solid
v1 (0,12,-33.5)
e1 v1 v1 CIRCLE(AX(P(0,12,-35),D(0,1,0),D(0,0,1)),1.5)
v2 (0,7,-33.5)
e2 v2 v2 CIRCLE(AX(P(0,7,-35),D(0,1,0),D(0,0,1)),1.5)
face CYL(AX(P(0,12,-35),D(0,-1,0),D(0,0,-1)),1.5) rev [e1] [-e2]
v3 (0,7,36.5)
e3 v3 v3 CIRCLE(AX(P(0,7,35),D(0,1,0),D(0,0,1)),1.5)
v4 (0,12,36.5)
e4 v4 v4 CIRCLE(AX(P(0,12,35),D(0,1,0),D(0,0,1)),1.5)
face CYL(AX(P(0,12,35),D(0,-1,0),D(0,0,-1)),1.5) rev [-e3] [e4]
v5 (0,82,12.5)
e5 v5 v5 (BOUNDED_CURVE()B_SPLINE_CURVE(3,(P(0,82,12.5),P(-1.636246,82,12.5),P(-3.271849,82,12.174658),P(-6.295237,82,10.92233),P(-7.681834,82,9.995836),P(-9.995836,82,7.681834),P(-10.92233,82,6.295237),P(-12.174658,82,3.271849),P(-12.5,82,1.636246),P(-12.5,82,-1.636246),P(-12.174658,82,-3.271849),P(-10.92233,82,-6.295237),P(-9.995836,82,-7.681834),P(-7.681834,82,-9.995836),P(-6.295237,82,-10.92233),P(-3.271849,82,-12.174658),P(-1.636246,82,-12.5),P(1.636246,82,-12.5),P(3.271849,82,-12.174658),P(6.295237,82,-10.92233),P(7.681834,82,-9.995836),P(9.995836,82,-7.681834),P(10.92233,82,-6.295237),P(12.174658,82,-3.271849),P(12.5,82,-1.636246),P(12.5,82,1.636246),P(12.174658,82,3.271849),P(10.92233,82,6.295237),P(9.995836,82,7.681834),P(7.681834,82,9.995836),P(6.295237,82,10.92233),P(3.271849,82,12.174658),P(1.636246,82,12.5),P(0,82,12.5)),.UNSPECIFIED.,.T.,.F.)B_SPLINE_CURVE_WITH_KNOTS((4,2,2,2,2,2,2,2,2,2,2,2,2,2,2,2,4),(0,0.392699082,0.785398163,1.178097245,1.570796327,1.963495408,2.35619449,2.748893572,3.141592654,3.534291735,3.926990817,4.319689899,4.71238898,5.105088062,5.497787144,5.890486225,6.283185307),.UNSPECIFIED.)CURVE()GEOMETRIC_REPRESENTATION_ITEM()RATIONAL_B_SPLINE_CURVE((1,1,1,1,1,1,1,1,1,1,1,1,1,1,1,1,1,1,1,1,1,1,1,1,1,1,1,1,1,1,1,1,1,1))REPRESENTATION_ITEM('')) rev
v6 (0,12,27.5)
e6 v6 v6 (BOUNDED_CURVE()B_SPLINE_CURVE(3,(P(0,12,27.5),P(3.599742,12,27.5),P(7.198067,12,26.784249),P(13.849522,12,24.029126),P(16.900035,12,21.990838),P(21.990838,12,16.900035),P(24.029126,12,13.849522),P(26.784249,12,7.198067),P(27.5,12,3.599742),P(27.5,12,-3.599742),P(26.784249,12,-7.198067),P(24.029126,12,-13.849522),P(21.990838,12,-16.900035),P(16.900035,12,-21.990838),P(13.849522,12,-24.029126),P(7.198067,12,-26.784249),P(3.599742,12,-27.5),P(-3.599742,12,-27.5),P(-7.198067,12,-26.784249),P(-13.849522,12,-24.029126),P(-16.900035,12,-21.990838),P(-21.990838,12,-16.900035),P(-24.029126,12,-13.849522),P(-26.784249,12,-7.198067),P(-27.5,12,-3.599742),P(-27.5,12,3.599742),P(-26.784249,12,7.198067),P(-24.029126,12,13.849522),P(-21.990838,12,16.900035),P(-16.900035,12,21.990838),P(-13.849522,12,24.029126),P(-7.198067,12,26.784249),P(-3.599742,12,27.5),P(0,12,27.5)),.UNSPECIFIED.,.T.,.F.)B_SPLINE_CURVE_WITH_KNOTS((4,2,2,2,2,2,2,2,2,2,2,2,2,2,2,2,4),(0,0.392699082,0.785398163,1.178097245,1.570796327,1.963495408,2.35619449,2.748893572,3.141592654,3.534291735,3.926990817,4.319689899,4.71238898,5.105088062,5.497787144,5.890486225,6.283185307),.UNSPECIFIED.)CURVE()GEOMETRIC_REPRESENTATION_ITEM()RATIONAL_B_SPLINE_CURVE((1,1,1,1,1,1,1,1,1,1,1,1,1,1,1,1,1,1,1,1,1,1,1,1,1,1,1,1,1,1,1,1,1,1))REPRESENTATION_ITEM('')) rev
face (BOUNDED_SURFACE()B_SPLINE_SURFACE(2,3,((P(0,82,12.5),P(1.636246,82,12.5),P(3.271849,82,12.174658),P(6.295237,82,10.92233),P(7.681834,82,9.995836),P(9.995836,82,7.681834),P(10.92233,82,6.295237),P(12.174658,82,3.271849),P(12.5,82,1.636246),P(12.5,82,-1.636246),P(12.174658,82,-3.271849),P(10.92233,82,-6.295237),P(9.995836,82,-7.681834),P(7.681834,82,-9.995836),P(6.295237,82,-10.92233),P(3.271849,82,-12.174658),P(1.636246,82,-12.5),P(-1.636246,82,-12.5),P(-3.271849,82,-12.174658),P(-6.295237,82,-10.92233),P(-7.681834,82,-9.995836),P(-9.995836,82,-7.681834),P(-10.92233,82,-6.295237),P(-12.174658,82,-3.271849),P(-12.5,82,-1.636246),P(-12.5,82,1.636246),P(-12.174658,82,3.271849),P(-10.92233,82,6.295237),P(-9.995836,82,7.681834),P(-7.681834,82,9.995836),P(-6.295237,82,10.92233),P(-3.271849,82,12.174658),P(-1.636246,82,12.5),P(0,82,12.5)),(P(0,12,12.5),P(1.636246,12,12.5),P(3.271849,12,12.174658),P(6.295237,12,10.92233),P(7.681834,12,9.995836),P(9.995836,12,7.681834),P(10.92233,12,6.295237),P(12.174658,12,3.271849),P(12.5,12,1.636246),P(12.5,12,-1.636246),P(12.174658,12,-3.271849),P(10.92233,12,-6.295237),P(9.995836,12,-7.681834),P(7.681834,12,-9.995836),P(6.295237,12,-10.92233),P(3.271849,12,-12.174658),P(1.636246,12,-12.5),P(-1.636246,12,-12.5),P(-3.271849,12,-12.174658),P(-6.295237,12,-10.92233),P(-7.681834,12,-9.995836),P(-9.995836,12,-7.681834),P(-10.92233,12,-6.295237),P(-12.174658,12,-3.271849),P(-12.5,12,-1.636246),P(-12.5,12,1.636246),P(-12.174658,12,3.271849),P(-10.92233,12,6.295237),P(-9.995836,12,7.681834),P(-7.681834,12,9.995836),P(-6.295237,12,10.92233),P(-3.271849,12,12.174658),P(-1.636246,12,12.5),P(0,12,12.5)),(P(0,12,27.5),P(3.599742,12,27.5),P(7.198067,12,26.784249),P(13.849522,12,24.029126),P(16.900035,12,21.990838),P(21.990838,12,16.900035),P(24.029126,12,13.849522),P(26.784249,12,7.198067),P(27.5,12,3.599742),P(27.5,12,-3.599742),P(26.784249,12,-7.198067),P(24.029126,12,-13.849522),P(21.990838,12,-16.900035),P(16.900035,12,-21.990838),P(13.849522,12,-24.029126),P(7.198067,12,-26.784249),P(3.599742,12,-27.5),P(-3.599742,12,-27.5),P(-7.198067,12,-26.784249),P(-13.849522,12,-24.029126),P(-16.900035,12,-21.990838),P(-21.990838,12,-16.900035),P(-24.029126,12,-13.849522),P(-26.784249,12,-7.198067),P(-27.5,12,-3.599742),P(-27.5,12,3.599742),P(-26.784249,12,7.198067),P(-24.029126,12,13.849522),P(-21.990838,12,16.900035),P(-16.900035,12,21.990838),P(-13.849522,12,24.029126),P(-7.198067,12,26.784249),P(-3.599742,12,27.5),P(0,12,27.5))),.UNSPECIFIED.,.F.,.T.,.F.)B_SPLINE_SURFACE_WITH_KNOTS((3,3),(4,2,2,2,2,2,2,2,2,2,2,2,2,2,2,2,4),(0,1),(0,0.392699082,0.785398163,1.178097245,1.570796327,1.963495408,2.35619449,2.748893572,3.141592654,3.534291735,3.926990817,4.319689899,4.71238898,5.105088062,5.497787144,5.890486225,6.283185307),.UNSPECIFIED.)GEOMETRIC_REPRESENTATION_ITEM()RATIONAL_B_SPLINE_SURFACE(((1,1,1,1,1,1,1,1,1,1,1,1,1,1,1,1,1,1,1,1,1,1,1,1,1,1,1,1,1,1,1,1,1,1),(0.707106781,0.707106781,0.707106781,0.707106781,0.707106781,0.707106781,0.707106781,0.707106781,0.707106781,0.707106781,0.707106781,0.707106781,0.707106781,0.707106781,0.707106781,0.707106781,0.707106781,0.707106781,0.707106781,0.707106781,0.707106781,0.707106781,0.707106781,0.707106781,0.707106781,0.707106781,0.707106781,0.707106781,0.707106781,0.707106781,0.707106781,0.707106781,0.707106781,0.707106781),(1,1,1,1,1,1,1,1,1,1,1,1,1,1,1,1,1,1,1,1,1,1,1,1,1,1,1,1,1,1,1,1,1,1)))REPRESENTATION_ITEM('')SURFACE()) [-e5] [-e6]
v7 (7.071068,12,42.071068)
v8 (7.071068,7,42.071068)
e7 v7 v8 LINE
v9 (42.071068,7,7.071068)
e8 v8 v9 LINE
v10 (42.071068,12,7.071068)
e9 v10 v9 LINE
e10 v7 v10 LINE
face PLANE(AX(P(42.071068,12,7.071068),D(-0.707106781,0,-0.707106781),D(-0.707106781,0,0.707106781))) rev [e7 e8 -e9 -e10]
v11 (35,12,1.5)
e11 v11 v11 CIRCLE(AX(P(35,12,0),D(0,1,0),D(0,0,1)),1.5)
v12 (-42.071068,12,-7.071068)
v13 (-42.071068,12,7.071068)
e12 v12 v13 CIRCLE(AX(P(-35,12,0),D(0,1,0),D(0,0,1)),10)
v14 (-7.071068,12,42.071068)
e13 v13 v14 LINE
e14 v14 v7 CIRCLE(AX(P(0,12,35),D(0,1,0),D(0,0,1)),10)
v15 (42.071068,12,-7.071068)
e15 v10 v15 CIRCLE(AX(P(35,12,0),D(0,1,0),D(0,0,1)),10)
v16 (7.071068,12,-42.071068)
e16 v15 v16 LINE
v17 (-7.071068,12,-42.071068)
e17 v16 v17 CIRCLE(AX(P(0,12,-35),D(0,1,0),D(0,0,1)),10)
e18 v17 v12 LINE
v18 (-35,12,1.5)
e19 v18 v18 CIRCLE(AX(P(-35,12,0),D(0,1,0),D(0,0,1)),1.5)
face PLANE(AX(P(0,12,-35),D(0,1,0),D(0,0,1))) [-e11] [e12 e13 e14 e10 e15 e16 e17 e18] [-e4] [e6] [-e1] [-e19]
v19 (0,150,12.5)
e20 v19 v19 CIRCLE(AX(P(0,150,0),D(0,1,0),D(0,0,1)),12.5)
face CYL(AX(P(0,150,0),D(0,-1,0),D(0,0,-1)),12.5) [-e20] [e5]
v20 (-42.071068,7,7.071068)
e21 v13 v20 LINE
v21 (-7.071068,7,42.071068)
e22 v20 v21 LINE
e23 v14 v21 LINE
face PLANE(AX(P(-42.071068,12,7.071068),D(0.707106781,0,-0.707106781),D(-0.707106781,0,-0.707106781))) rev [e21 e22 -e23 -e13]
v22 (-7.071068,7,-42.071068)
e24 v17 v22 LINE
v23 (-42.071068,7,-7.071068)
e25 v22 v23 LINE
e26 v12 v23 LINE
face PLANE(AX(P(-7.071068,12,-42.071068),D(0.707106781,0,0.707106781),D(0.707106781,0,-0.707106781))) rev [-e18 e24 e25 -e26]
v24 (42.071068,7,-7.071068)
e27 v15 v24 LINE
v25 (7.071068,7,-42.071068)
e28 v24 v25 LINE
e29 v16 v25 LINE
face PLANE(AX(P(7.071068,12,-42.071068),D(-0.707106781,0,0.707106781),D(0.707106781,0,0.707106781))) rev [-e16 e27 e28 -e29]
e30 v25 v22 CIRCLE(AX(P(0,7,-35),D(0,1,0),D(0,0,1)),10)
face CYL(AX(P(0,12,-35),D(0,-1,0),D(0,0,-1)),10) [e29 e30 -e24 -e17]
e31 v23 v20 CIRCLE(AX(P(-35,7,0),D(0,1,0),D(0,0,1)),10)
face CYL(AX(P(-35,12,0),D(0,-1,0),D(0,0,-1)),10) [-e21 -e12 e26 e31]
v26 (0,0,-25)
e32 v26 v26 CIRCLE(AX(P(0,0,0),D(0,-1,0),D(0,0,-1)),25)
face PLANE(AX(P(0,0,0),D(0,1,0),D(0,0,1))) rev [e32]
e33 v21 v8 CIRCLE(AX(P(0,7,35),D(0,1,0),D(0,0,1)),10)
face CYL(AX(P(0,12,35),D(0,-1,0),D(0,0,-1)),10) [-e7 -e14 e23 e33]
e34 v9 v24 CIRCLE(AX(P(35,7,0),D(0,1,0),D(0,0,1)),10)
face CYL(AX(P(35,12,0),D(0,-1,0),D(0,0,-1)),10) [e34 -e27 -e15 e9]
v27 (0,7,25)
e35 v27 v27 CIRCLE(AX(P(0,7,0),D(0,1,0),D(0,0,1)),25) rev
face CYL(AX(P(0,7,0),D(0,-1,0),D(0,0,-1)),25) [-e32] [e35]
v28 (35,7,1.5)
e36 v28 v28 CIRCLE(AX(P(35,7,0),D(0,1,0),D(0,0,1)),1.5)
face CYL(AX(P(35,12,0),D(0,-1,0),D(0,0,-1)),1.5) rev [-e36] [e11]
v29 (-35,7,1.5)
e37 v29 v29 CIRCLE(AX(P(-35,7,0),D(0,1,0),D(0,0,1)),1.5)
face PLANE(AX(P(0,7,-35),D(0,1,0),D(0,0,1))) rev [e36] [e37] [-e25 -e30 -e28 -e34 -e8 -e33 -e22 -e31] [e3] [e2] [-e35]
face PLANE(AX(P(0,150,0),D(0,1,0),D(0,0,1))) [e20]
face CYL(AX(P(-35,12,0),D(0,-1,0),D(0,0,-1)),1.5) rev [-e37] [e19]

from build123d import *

# Parameters (mm, degrees)
CROQUIS1_R              = 12.5
SALIENTE_EXTRUIR1_DEPTH = 150
CROQUIS2_R              = 25
SALIENTE_EXTRUIR2_DEPTH = 7
CROQUIS3_R              = 1.5
SALIENTE_EXTRUIR3_DEPTH = 5
REDONDEO1_SIZE          = 15
REDONDEO1_SIZE_2        = 70


with BuildPart() as part:
    # Croquis1 → Saliente-Extruir1 (new body)
    with BuildSketch(Plane(origin=(0, 0, 0), x_dir=(1, 0, 0), z_dir=(0, 1, 0))):
        with Locations(Location((0, 0, 0), (0, 0, 270))):
            Circle(CROQUIS1_R)
    extrude(amount=SALIENTE_EXTRUIR1_DEPTH)

    # Croquis2 → Saliente-Extruir2 (add)
    with BuildSketch(Plane.XZ):
        with Locations(Location((0, 0, 0), (0, 0, 270))):
            Circle(CROQUIS2_R)
    extrude(amount=-SALIENTE_EXTRUIR2_DEPTH)

    # Croquis3 → Saliente-Extruir3 (add)
    with BuildSketch(Plane(origin=(0, 7, 0), x_dir=(1, 0, 0), z_dir=(0, 1, 0))):
        with BuildLine():
            Line((-7.071067812, 42.071067812), (-42.071067812, 7.071067812))
            ThreePointArc((-42.071067812, 7.071067812), (-45, 0), (-42.071067812, -7.071067812))
            Line((-42.071067812, -7.071067812), (-7.071067812, -42.071067812))
            ThreePointArc((-7.071067812, -42.071067812), (0, -45), (7.071067812, -42.071067812))
            Line((7.071067812, -42.071067812), (42.071067812, -7.071067812))
            ThreePointArc((42.071067812, -7.071067812), (45, 0), (42.071067812, 7.071067812))
            Line((42.071067812, 7.071067812), (7.071067812, 42.071067812))
            ThreePointArc((7.071067812, 42.071067812), (0, 45), (-7.071067812, 42.071067812))
        make_face()
        with Locations(Location((-35, 0, 0), (0, 0, 270))):
            Circle(CROQUIS3_R, mode=Mode.SUBTRACT)
        with Locations(Location((0, 35, 0), (0, 0, 270))):
            Circle(CROQUIS3_R, mode=Mode.SUBTRACT)
        with Locations(Location((35, 0, 0), (0, 0, 270))):
            Circle(CROQUIS3_R, mode=Mode.SUBTRACT)
        with Locations(Location((0, -35, 0), (0, 0, 270))):
            Circle(CROQUIS3_R, mode=Mode.SUBTRACT)
    extrude(amount=SALIENTE_EXTRUIR3_DEPTH)

    # Redondeo1
    # an asymmetric fillet: 70, 15 mm, written as the material it adds along each edge
    with BuildSketch(Plane(origin=(0, 12, 0), x_dir=(0, 0, 1), z_dir=(1, 0, 0))) as redondeo1_piece_1:
        with BuildLine():
            Bezier((12.5 + REDONDEO1_SIZE, REDONDEO1_SIZE * 9.99999999998e-06), (12.49985, 0.00015), (12.5 - REDONDEO1_SIZE_2 * 2.14285714285e-06, -REDONDEO1_SIZE_2), weights=[1, 0.707106781, 1])
            Line((12.5 - REDONDEO1_SIZE_2 * 2.14285714285e-06, -REDONDEO1_SIZE_2), (11.09985, -70))
            ThreePointArc((11.09985, -70), (11.1, -35), (11.1, 0))
            Line((11.1, 0), (12.5, 1.4))
            ThreePointArc((12.5, 1.4), (20, 1.4), (27.5, 1.40015))
            Line((27.5, 1.40015), (12.5 + REDONDEO1_SIZE, REDONDEO1_SIZE * 9.99999999998e-06))
        make_face()
    revolve(axis=Axis((0, 12, 0), (0, -1, 0)))


solid = part.part
